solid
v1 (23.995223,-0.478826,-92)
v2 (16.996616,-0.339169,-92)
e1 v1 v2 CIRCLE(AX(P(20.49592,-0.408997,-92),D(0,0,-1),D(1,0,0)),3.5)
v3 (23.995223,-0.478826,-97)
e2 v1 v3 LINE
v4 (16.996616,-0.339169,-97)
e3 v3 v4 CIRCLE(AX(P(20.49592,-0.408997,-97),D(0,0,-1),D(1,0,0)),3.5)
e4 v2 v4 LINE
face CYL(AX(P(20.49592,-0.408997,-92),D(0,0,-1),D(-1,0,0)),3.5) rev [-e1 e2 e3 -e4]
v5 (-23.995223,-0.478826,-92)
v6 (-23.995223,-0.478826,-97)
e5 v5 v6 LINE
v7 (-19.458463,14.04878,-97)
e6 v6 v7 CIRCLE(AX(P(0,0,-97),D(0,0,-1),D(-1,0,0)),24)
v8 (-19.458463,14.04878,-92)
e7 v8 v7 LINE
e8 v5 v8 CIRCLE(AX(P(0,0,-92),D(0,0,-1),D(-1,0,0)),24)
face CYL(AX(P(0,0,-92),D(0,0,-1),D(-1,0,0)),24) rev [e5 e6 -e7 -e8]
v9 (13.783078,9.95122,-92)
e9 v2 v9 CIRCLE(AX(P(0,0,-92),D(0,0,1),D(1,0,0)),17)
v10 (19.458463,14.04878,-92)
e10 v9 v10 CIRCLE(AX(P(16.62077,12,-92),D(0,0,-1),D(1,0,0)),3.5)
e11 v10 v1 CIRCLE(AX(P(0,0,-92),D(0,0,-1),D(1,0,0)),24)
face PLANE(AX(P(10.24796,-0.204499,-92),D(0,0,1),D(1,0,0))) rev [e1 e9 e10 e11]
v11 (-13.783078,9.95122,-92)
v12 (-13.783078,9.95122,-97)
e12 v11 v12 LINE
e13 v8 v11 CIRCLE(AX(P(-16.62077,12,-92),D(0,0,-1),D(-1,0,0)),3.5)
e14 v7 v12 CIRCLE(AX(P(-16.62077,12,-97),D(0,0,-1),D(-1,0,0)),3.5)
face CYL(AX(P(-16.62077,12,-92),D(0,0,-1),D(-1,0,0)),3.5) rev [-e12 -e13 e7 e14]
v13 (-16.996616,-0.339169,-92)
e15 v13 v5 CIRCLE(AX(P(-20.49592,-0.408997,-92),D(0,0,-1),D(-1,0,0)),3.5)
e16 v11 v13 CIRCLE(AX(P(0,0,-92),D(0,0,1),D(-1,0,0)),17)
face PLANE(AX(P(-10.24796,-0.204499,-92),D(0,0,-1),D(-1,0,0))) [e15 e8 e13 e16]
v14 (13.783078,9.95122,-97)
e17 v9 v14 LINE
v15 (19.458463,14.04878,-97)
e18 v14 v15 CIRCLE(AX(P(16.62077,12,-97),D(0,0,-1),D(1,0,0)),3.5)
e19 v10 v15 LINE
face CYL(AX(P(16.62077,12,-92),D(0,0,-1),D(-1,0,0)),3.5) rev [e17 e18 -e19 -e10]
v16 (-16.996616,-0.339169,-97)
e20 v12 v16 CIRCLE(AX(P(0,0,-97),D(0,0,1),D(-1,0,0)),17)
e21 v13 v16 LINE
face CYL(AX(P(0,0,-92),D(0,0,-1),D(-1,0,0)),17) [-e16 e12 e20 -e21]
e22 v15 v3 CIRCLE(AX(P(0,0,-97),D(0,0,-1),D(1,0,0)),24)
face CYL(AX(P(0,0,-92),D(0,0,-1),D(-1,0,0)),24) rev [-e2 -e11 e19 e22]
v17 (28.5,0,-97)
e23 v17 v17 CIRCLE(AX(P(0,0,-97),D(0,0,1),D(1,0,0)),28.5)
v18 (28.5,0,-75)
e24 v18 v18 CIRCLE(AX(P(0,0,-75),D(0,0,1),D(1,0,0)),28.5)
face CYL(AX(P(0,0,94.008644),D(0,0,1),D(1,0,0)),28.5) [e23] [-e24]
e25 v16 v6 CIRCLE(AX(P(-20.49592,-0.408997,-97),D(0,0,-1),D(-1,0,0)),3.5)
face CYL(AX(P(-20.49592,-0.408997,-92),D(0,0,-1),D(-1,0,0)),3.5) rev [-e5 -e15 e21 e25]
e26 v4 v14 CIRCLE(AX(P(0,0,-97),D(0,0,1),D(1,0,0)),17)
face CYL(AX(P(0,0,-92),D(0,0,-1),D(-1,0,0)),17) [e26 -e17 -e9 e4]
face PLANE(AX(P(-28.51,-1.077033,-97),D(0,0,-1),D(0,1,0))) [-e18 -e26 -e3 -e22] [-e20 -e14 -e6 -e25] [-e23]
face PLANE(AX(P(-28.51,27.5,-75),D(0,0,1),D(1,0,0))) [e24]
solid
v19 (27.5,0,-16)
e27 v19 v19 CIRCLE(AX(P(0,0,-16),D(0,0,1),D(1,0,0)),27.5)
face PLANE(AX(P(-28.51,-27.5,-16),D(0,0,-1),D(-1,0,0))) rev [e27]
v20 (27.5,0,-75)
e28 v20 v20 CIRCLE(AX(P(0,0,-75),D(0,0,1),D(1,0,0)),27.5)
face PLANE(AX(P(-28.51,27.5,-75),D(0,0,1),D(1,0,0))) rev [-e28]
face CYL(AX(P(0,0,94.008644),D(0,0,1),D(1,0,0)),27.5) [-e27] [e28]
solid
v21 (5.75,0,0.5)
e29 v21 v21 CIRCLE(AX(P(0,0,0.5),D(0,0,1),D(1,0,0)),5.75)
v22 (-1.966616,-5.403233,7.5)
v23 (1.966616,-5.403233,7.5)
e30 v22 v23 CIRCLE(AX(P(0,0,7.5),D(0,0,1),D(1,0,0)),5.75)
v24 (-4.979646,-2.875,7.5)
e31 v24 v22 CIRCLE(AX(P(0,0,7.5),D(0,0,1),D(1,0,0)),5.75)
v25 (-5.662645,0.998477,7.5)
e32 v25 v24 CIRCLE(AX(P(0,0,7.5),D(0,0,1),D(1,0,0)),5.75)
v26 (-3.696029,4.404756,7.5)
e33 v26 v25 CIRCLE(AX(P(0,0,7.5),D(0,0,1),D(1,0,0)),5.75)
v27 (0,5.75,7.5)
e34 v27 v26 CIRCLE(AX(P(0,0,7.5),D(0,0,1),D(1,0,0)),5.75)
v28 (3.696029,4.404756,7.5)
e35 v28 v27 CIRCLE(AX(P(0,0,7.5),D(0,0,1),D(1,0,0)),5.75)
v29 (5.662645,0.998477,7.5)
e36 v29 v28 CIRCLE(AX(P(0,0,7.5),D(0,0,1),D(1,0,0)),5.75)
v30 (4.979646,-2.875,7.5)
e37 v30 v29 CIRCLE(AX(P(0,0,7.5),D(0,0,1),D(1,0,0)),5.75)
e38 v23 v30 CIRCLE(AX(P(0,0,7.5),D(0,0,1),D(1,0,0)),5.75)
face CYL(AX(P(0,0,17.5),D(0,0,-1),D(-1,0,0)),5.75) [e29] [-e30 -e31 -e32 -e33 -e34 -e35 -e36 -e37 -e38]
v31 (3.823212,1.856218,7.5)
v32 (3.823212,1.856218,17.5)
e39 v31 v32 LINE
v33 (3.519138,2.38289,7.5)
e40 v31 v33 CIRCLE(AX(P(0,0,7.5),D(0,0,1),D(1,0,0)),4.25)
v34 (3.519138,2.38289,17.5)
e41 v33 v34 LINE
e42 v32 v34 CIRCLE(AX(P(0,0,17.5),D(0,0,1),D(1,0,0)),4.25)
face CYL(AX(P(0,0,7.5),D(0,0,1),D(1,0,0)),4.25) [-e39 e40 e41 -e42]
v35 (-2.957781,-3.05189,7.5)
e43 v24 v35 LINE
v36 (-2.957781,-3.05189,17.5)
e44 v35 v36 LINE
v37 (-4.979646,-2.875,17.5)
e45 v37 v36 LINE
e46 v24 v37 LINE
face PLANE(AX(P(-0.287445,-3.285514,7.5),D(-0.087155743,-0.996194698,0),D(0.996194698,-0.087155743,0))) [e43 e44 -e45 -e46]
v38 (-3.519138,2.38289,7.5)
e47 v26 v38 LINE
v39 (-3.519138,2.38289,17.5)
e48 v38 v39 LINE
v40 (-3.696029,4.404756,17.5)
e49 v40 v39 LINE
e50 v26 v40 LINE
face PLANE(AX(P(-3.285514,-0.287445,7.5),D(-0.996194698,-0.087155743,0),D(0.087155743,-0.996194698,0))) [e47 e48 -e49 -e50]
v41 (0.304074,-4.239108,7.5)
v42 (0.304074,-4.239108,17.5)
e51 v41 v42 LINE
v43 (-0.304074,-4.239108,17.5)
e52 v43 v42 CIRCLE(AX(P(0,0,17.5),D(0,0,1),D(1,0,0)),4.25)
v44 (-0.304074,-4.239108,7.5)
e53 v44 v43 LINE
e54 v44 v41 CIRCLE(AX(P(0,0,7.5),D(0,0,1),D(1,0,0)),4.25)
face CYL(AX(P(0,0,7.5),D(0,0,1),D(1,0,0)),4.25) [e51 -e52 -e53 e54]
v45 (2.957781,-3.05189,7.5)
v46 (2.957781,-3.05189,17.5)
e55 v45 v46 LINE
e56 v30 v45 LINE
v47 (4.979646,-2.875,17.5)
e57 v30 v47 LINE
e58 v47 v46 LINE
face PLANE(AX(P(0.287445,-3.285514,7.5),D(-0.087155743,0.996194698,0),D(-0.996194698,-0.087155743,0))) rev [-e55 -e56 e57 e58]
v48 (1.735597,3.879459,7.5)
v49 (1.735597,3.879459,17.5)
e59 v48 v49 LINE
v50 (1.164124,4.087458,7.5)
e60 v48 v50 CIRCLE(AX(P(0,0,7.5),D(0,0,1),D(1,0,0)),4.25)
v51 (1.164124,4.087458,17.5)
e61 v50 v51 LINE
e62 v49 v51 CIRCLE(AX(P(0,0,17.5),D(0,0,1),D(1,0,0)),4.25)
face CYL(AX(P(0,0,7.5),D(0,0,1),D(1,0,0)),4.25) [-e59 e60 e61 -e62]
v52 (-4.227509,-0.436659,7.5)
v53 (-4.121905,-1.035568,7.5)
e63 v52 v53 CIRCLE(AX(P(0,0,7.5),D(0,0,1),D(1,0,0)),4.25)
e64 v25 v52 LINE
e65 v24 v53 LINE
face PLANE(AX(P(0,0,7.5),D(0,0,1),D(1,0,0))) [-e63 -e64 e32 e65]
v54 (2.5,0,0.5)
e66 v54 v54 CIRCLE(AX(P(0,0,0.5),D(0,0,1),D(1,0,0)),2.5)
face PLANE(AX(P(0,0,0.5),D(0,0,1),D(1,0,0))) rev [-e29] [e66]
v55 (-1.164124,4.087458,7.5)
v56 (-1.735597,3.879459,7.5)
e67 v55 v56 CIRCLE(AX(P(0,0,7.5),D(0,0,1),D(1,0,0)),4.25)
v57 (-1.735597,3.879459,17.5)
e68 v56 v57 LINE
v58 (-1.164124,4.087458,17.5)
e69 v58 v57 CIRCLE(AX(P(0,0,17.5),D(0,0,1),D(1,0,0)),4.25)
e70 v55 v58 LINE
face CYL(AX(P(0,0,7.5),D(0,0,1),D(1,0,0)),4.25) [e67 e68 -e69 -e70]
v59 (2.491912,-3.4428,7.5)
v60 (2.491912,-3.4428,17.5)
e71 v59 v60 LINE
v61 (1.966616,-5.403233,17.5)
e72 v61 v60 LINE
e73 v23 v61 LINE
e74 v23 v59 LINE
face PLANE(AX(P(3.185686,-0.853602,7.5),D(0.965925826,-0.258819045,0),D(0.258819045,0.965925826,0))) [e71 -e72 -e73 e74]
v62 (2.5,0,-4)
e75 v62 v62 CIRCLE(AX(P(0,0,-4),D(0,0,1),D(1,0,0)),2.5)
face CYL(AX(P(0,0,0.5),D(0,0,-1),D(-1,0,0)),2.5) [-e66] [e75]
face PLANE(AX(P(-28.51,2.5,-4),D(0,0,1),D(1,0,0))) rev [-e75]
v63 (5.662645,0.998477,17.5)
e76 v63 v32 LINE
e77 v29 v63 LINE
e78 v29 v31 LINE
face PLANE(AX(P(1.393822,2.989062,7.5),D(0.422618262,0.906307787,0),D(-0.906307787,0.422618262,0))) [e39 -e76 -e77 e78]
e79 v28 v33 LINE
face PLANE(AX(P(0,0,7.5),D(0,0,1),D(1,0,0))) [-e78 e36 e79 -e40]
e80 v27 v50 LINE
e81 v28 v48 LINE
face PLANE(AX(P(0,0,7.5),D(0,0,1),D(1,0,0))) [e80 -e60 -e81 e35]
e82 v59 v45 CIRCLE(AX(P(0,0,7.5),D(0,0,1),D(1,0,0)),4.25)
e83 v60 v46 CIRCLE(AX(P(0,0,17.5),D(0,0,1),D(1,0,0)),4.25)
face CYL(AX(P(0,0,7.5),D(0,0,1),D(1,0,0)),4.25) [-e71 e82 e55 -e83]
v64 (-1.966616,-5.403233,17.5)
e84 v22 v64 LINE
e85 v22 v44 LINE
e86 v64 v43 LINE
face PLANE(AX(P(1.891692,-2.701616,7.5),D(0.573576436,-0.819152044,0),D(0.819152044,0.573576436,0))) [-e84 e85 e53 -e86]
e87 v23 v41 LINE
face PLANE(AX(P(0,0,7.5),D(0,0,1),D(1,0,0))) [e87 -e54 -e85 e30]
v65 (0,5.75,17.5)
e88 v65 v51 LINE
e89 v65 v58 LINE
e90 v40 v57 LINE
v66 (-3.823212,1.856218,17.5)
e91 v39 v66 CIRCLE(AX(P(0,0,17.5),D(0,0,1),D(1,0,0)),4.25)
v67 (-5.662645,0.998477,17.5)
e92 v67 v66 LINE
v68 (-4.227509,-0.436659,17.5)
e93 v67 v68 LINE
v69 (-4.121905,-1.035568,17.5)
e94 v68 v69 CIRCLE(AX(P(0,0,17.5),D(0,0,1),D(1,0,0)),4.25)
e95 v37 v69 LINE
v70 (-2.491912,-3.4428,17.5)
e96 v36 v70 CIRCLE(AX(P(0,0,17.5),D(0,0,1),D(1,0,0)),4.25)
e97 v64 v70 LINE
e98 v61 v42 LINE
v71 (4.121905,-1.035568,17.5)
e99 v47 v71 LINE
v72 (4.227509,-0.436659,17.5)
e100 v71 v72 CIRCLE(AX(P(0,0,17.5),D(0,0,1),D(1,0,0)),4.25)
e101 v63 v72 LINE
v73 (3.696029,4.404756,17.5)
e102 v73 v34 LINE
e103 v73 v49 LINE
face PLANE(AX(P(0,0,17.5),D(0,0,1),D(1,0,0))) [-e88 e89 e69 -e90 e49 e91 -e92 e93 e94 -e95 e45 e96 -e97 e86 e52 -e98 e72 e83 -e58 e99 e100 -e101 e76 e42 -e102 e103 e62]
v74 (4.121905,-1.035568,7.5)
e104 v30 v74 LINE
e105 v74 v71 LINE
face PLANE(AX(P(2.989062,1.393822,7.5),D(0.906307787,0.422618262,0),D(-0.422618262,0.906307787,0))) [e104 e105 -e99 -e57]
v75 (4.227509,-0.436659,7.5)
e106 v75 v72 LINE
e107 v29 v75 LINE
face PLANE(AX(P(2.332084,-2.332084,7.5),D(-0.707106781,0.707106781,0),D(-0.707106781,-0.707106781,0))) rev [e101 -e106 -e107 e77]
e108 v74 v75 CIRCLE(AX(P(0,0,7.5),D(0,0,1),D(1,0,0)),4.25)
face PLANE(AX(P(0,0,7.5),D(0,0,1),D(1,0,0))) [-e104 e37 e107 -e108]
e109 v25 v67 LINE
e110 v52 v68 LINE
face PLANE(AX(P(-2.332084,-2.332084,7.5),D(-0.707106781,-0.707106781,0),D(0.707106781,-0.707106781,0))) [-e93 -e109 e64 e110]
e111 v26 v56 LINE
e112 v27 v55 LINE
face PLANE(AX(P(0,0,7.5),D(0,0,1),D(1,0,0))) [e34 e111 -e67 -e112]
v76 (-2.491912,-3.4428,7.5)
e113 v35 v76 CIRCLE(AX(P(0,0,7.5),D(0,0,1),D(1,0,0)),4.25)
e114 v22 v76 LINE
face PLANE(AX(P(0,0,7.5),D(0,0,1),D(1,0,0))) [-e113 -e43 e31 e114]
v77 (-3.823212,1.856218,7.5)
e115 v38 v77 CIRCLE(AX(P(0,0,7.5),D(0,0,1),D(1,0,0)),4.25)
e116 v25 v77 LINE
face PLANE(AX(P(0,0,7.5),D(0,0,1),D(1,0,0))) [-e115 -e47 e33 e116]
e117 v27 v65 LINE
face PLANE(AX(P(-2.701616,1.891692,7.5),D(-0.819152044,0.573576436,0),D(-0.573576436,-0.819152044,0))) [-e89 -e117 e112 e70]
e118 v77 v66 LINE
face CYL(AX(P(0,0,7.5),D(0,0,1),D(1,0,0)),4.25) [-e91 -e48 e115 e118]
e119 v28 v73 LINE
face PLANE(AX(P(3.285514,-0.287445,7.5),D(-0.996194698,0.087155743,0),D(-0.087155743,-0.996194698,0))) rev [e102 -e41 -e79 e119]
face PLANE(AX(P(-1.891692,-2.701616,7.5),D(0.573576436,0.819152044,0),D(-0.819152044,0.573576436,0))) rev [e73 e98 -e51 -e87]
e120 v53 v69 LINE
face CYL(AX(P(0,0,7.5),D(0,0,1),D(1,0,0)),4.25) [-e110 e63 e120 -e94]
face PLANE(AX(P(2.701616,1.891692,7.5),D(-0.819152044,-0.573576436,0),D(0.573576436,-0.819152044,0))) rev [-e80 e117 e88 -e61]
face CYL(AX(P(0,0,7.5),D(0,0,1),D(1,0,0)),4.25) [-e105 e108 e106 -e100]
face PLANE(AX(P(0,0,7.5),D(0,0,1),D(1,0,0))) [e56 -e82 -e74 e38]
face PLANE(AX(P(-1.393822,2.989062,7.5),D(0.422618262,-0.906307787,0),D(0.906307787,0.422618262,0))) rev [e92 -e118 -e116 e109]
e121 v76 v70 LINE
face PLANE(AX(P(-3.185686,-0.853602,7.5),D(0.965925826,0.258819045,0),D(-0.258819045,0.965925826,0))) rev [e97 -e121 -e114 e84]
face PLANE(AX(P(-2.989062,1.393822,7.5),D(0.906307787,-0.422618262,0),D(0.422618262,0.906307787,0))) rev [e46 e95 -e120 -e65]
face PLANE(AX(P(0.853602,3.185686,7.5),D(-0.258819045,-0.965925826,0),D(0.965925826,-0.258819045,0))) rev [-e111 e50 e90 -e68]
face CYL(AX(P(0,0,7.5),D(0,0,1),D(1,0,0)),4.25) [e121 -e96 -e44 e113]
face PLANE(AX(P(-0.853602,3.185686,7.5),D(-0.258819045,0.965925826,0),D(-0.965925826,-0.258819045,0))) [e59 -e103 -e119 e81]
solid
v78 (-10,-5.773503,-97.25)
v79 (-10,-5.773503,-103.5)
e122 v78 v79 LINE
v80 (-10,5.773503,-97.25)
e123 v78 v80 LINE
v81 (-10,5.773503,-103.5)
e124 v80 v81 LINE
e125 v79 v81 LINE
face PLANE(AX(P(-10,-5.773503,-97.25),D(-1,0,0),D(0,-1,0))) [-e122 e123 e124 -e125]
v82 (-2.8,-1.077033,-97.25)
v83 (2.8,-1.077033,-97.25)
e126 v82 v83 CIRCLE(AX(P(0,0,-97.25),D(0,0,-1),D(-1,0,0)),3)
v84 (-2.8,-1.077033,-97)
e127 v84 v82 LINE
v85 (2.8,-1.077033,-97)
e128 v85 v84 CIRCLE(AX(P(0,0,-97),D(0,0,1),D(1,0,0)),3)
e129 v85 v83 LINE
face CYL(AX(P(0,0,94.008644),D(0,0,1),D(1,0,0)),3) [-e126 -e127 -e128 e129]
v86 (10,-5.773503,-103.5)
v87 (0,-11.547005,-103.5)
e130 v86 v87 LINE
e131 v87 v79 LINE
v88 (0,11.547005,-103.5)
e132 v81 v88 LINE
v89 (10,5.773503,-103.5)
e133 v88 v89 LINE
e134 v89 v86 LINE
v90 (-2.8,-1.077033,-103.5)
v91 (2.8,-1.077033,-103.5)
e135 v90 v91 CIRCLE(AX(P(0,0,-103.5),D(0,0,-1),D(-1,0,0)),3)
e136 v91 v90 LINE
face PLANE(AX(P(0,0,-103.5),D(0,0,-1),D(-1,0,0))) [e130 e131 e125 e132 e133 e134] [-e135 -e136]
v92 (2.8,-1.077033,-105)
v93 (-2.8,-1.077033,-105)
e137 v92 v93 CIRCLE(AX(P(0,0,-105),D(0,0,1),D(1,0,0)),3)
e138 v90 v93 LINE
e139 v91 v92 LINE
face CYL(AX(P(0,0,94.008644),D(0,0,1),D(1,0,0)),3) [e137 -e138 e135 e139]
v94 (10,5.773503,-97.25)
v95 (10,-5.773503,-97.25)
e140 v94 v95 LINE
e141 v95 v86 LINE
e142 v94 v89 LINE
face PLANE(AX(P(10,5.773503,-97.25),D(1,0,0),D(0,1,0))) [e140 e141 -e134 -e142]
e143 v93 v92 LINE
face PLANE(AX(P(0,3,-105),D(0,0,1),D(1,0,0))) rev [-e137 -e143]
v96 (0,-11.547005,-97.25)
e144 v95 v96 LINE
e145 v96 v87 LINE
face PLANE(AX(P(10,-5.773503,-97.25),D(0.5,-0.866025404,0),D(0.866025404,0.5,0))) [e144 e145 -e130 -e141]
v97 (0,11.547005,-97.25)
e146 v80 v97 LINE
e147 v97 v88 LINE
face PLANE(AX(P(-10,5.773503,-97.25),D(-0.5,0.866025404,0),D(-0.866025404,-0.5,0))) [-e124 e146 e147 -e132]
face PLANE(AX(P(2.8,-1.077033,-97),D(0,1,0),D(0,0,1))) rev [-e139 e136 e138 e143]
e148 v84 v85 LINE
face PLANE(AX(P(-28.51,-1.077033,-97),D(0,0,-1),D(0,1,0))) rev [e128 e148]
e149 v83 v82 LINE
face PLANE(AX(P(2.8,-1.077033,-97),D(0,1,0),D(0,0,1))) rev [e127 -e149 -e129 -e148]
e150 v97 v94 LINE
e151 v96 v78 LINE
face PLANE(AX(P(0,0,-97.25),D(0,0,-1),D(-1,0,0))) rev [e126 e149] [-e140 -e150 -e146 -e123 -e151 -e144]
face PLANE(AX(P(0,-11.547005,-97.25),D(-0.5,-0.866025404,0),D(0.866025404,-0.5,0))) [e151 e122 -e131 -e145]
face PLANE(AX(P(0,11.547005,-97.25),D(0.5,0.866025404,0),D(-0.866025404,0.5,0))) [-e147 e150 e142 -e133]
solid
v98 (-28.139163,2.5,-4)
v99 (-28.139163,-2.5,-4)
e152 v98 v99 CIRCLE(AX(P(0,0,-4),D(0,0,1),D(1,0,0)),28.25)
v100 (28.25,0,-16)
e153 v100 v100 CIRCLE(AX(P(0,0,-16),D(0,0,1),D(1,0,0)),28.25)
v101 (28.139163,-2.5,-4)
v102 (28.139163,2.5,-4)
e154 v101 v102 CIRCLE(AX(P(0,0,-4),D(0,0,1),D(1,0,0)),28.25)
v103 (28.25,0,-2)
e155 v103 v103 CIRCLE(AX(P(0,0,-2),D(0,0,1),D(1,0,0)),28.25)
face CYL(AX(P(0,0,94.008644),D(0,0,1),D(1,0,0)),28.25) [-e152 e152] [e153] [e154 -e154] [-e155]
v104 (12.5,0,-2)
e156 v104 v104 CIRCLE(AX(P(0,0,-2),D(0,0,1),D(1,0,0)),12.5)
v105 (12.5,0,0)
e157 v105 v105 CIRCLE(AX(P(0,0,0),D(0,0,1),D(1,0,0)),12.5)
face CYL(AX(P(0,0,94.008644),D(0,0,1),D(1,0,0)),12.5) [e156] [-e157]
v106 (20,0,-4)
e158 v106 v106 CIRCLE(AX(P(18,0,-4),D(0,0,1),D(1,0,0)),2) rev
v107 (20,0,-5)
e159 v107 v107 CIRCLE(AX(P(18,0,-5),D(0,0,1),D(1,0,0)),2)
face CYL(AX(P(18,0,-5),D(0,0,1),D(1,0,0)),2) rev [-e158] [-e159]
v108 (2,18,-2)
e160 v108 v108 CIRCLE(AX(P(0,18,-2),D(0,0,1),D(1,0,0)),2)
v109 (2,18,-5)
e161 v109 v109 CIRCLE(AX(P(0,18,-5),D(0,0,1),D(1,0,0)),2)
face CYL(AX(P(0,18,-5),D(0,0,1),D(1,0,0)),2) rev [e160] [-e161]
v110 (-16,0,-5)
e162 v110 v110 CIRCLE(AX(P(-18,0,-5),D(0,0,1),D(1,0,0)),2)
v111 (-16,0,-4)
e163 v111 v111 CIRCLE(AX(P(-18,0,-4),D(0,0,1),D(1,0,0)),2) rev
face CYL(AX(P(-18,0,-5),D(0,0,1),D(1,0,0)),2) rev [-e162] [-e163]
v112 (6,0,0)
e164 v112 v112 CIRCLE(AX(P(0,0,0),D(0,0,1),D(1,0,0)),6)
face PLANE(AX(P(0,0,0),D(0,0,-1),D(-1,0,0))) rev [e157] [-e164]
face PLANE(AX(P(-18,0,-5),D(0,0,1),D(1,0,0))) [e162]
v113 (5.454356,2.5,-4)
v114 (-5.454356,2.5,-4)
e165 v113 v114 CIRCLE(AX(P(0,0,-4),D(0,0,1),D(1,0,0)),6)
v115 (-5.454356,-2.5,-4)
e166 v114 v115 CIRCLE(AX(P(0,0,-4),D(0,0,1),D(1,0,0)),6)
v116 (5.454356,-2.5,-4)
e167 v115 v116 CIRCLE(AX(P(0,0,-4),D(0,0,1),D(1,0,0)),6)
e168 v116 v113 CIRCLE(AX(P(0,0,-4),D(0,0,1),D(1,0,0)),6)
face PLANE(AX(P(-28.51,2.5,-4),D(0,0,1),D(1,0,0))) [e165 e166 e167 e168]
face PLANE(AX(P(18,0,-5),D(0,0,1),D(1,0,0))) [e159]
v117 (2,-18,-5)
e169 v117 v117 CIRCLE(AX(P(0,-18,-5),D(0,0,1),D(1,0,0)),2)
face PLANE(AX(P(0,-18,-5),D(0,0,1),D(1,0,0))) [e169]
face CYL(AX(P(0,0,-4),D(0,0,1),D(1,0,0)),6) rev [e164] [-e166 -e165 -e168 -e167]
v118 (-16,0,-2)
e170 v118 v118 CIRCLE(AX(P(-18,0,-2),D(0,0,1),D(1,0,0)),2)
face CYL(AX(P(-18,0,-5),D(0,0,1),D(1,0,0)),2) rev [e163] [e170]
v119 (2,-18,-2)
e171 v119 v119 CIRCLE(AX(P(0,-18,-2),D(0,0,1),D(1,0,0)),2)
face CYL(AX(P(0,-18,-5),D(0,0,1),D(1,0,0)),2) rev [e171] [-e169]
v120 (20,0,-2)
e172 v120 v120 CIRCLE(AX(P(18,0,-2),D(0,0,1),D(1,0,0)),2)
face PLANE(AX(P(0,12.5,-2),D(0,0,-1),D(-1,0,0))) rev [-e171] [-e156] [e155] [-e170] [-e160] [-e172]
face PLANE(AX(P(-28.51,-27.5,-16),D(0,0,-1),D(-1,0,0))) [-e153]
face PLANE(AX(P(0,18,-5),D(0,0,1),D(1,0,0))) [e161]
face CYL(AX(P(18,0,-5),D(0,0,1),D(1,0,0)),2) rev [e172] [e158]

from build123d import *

# Parameters (mm, degrees)
SKETCH5_R           = 2
CUT_EXTRUDE1_DEPTH  = 3
SKETCH13_R          = 6
CUT_EXTRUDE3_DEPTH  = 4
SKETCH14_R          = 2.5
BOSS_EXTRUDE2_DEPTH = 4.5
SKETCH15_R          = 5.75
BOSS_EXTRUDE3_DEPTH = 17
CUT_EXTRUDE7_START  = -10
CUT_EXTRUDE7_DEPTH  = 10
CUT_EXTRUDE9_DEPTH  = 8
BOSS_EXTRUDE7_DEPTH = 6.25
CUT_EXTRUDE10_DEPTH = 5
SPLIT1_START        = -97
SPLIT1_OUTLINE_R    = 28.5
SPLIT1_DEPTH        = 22
SPLIT1_START_2      = -92
SPLIT1_2_DEPTH      = 17
SPLIT1_START_3      = -75
SPLIT1_3_OUTLINE_R  = 27.5
SPLIT1_3_DEPTH      = 59
SPLIT1_START_4      = -105
SPLIT1_4_OUTLINE_R  = 28.5
SPLIT1_4_DEPTH      = 89
SPLIT1_START_5      = -4
SPLIT1_5_OUTLINE_R  = 5.75
SPLIT1_5_DEPTH      = 21.5
SPLIT1_START_6      = 0.5
SPLIT1_6_DEPTH      = 17
SPLIT1_7_DEPTH      = 7
SPLIT1_8_OUTLINE_R  = 2.5
SPLIT1_8_DEPTH      = 4.5
SPLIT1_START_7      = -103.5
SPLIT1_9_DEPTH      = 6.25
SPLIT1_10_DEPTH     = 8


# Read off the part's stored shape, not the designer's step: Split1
with BuildPart() as part:
    # Sketch3 → Revolve1 (revolve)
    with BuildSketch(Plane(origin=(0, 0, 0), x_dir=(0, 0, -1), z_dir=(1, 0, 0)), mode=Mode.PRIVATE) as revolve1_sk:
        Polygon((0, 0), (0, 12.5), (2, 12.5), (2, 28.25), (16, 28.25), (16, 27.5), (75, 27.5), (75, 28.5), (97, 28.5), (97, 3), (105, 3), (105, 0), (97, 0), align=None)
    revolve(revolve1_sk.sketch.rotate(Axis((0, 0, 94.008643936), (0, 0, -1)), 90), axis=Axis((0, 0, 94.008643936), (0, 0, -1)))

    # Sketch5 → Cut-Extrude1 (cut)
    with BuildSketch(Plane.XY.offset(-2)):
        with Locations((0, 18)):
            Circle(SKETCH5_R)
        with Locations((18, 0)):
            Circle(SKETCH5_R)
        with Locations((0, -18)):
            Circle(SKETCH5_R)
        with Locations((-18, 0)):
            Circle(SKETCH5_R)
    extrude(amount=-CUT_EXTRUDE1_DEPTH, mode=Mode.SUBTRACT)

    # Sketch13 → Cut-Extrude3 (cut)
    with BuildSketch(Plane.XY):
        Circle(SKETCH13_R)
    extrude(amount=-CUT_EXTRUDE3_DEPTH, mode=Mode.SUBTRACT)

    # Sketch14 → Boss-Extrude2 (add)
    with BuildSketch(Plane.XY.offset(-4)):
        Circle(SKETCH14_R)
    extrude(amount=BOSS_EXTRUDE2_DEPTH)

    # Sketch15 → Boss-Extrude3 (add)
    with BuildSketch(Plane.XY.offset(0.5)):
        Circle(SKETCH15_R)
    extrude(amount=BOSS_EXTRUDE3_DEPTH)

    # Sketch17 → Cut-Extrude7 (cut)
    with BuildSketch(Plane.XY.offset(17.5).offset(CUT_EXTRUDE7_START)):
        with BuildLine():
            Line((-1.164124293, 4.087458211), (0, 5.75))
            ThreePointArc((0, 5.75), (-1.966615824, 5.40323257), (-3.696028756, 4.404755548))
            Line((-3.696028756, 4.404755548), (-1.735596548, 3.879459321))
            ThreePointArc((-1.735596548, 3.879459321), (-1.453585609, 3.993693638), (-1.164124293, 4.087458211))
        make_face()
        with BuildLine():
            Line((-3.519138439, 2.382889978), (-3.696028756, 4.404755548))
            ThreePointArc((-3.696028756, 4.404755548), (-4.979646072, 2.875), (-5.66264458, 0.998477022))
            Line((-5.66264458, 0.998477022), (-3.823212475, 1.856218299))
            ThreePointArc((-3.823212475, 1.856218299), (-3.680607966, 2.125), (-3.519138439, 2.382889978))
        make_face()
        with BuildLine():
            Line((-4.227508599, -0.436658959), (-5.66264458, 0.998477022))
            ThreePointArc((-5.66264458, 0.998477022), (-5.66264458, -0.998477022), (-4.979646072, -2.875))
            Line((-4.979646072, -2.875), (-4.121904795, -1.035567895))
            ThreePointArc((-4.121904795, -1.035567895), (-4.18543295, -0.738004755), (-4.227508599, -0.436658959))
        make_face()
        with BuildLine():
            Line((-2.957780502, -3.051890317), (-4.979646072, -2.875))
            ThreePointArc((-4.979646072, -2.875), (-3.696028756, -4.404755548), (-1.966615824, -5.40323257))
            Line((-1.966615824, -5.40323257), (-2.491912051, -3.442800362))
            ThreePointArc((-2.491912051, -3.442800362), (-2.731847341, -3.255688883), (-2.957780502, -3.051890317))
        make_face()
        with BuildLine():
            Line((-0.304074036, -4.239108277), (-1.966615824, -5.40323257))
            ThreePointArc((-1.966615824, -5.40323257), (0, -5.75), (1.966615824, -5.40323257))
            Line((1.966615824, -5.40323257), (0.304074036, -4.239108277))
            ThreePointArc((0.304074036, -4.239108277), (0, -4.25), (-0.304074036, -4.239108277))
        make_face()
        with BuildLine():
            ThreePointArc((1.966615824, -5.40323257), (3.696028756, -4.404755548), (4.979646072, -2.875))
            Line((4.979646072, -2.875), (2.957780502, -3.051890317))
            ThreePointArc((2.957780502, -3.051890317), (2.731847341, -3.255688883), (2.491912051, -3.442800362))
            Line((2.491912051, -3.442800362), (1.966615824, -5.40323257))
        make_face()
        with BuildLine():
            ThreePointArc((5.75, 0), (5.728119514, 0.501145521), (5.66264458, 0.998477022))
            Line((5.66264458, 0.998477022), (4.227508599, -0.436658959))
            ThreePointArc((4.227508599, -0.436658959), (4.18543295, -0.738004755), (4.121904795, -1.035567895))
            Line((4.121904795, -1.035567895), (4.979646072, -2.875))
            ThreePointArc((4.979646072, -2.875), (5.554073501, -1.488209509), (5.75, 0))
        make_face()
        with BuildLine():
            ThreePointArc((5.66264458, 0.998477022), (4.979646072, 2.875), (3.696028756, 4.404755548))
            Line((3.696028756, 4.404755548), (3.519138439, 2.382889978))
            ThreePointArc((3.519138439, 2.382889978), (3.680607966, 2.125), (3.823212475, 1.856218299))
            Line((3.823212475, 1.856218299), (5.66264458, 0.998477022))
        make_face()
        with BuildLine():
            ThreePointArc((3.696028756, 4.404755548), (1.966615824, 5.40323257), (0, 5.75))
            Line((0, 5.75), (1.164124293, 4.087458211))
            ThreePointArc((1.164124293, 4.087458211), (1.453585609, 3.993693638), (1.735596548, 3.879459321))
            Line((1.735596548, 3.879459321), (3.696028756, 4.404755548))
        make_face()
    extrude(amount=CUT_EXTRUDE7_DEPTH, mode=Mode.SUBTRACT)

    # Sketch24 → Cut-Extrude9 (cut)
    with BuildSketch(Plane(origin=(0, 0, -105), x_dir=(-1, 0, 0), z_dir=(0, 0, -1))):
        with BuildLine():
            Line((-2.8, -1.077032961), (2.8, -1.077032961))
            ThreePointArc((2.8, -1.077032961), (0, -3), (-2.8, -1.077032961))
        make_face()
    extrude(amount=-CUT_EXTRUDE9_DEPTH, mode=Mode.SUBTRACT)

    # Sketch26 → Boss-Extrude7 (add)
    with BuildSketch(Plane(origin=(0, 0, -103.5), x_dir=(-1, 0, 0), z_dir=(0, 0, -1))):
        Polygon((0, 11.547005384), (-10, 5.773502692), (-10, -5.773502692), (0, -11.547005384), (10, -5.773502692), (10, 5.773502692), align=None)
    extrude(amount=-BOSS_EXTRUDE7_DEPTH)

    # Sketch27 → Cut-Extrude10 (cut)
    with BuildSketch(Plane(origin=(0, 0, -97), x_dir=(-1, 0, 0), z_dir=(0, 0, -1))):
        with BuildLine():
            ThreePointArc((23.995222971, -0.478826225), (22.908918278, 7.154122122), (19.458462601, 14.048780488))
            ThreePointArc((19.458462601, 14.048780488), (14.571989651, 14.837692463), (13.783077676, 9.951219512))
            ThreePointArc((13.783077676, 9.951219512), (16.227150447, 5.06750317), (16.996616271, -0.339168576))
            ThreePointArc((16.996616271, -0.339168576), (20.426090797, -3.908300751), (23.995222971, -0.478826225))
        make_face()
        with BuildLine():
            ThreePointArc((-23.995222971, -0.478826225), (-22.908918278, 7.154122122), (-19.458462601, 14.048780488))
            ThreePointArc((-19.458462601, 14.048780488), (-14.571989651, 14.837692463), (-13.783077676, 9.951219512))
            ThreePointArc((-13.783077676, 9.951219512), (-16.227150447, 5.06750317), (-16.996616271, -0.339168576))
            ThreePointArc((-16.996616271, -0.339168576), (-20.426090797, -3.908300751), (-23.995222971, -0.478826225))
        make_face()
    extrude(amount=-CUT_EXTRUDE10_DEPTH, mode=Mode.SUBTRACT)

    # Split1 4 outline → Split1 4 (cut)
    with BuildSketch(Plane.XY.offset(SPLIT1_START_4)):
        Circle(SPLIT1_4_OUTLINE_R)
    extrude(amount=SPLIT1_4_DEPTH, mode=Mode.SUBTRACT)

    # Split1 5 outline → Split1 5 (cut)
    with BuildSketch(Plane.XY.offset(SPLIT1_START_5)):
        Circle(SPLIT1_5_OUTLINE_R)
    extrude(amount=SPLIT1_5_DEPTH, mode=Mode.SUBTRACT)


with BuildPart() as body_2:
    # Split1 outline → Split1 (new body)
    with BuildSketch(Plane.XY.offset(SPLIT1_START)):
        Circle(SPLIT1_OUTLINE_R)
        with BuildLine():
            ThreePointArc((-13.783077676, 9.951219512), (-16.227150447, 5.06750317), (-16.996616271, -0.339168576))
            ThreePointArc((-16.996616271, -0.339168576), (-20.426090796, -3.908300751), (-23.995222971, -0.478826225))
            ThreePointArc((-23.995222971, -0.478826225), (-22.908918278, 7.154122122), (-19.458462601, 14.048780488))
            ThreePointArc((-19.458462601, 14.048780488), (-14.57198965, 14.837692463), (-13.783077676, 9.951219512))
        make_face(mode=Mode.SUBTRACT)
        with BuildLine():
            ThreePointArc((19.458462601, 14.048780488), (22.908918278, 7.154122122), (23.995222971, -0.478826225))
            ThreePointArc((23.995222971, -0.478826225), (20.426090796, -3.908300751), (16.996616271, -0.339168576))
            ThreePointArc((16.996616271, -0.339168576), (16.227150447, 5.06750317), (13.783077676, 9.951219512))
            ThreePointArc((13.783077676, 9.951219512), (14.57198965, 14.837692463), (19.458462601, 14.048780488))
        make_face(mode=Mode.SUBTRACT)
    extrude(amount=SPLIT1_DEPTH)

    # Split1 2 outline → Split1 2 (add)
    with BuildSketch(Plane.XY.offset(SPLIT1_START_2)):
        with BuildLine():
            ThreePointArc((16.996616271, -0.339168576), (20.426090796, -3.908300751), (23.995222971, -0.478826225))
            ThreePointArc((23.995222971, -0.478826225), (22.908918278, 7.154122122), (19.458462601, 14.048780488))
            ThreePointArc((19.458462601, 14.048780488), (14.57198965, 14.837692463), (13.783077676, 9.951219512))
            ThreePointArc((13.783077676, 9.951219512), (16.227150447, 5.06750317), (16.996616271, -0.339168576))
        make_face()
        with BuildLine():
            ThreePointArc((-23.995222971, -0.478826225), (-20.426090796, -3.908300751), (-16.996616271, -0.339168576))
            ThreePointArc((-16.996616271, -0.339168576), (-16.227150447, 5.06750317), (-13.783077676, 9.951219512))
            ThreePointArc((-13.783077676, 9.951219512), (-14.57198965, 14.837692463), (-19.458462601, 14.048780488))
            ThreePointArc((-19.458462601, 14.048780488), (-22.908918278, 7.154122122), (-23.995222971, -0.478826225))
        make_face()
    extrude(amount=SPLIT1_2_DEPTH)


with BuildPart() as body_3:
    # Split1 3 outline → Split1 3 (new body)
    with BuildSketch(Plane.XY.offset(SPLIT1_START_3)):
        Circle(SPLIT1_3_OUTLINE_R)
    extrude(amount=SPLIT1_3_DEPTH)


with BuildPart() as body_4:
    # Split1 6 outline → Split1 6 (new body)
    with BuildSketch(Plane.XY.offset(SPLIT1_START_6)):
        with BuildLine():
            Line((4.227508599, -0.436658959), (5.66264458, 0.998477022))
            Line((5.66264458, 0.998477022), (3.823212475, 1.856218299))
            ThreePointArc((3.823212475, 1.856218299), (3.680607966, 2.125), (3.519138439, 2.382889978))
            Line((3.519138439, 2.382889978), (3.696028756, 4.404755548))
            Line((3.696028756, 4.404755548), (1.735596548, 3.879459321))
            ThreePointArc((1.735596548, 3.879459321), (1.453585609, 3.993693638), (1.164124293, 4.087458211))
            Line((1.164124293, 4.087458211), (0, 5.75))
            Line((0, 5.75), (-1.164124293, 4.087458211))
            ThreePointArc((-1.164124293, 4.087458211), (-1.453585609, 3.993693638), (-1.735596548, 3.879459321))
            Line((-1.735596548, 3.879459321), (-3.696028756, 4.404755548))
            Line((-3.696028756, 4.404755548), (-3.519138439, 2.382889978))
            ThreePointArc((-3.519138439, 2.382889978), (-3.680607966, 2.125), (-3.823212475, 1.856218299))
            Line((-3.823212475, 1.856218299), (-5.66264458, 0.998477022))
            Line((-5.66264458, 0.998477022), (-4.227508599, -0.436658959))
            ThreePointArc((-4.227508599, -0.436658959), (-4.18543295, -0.738004755), (-4.121904795, -1.035567895))
            Line((-4.121904795, -1.035567895), (-4.979646072, -2.875))
            Line((-4.979646072, -2.875), (-2.957780502, -3.051890317))
            ThreePointArc((-2.957780502, -3.051890317), (-2.731847341, -3.255688883), (-2.491912051, -3.442800362))
            Line((-2.491912051, -3.442800362), (-1.966615824, -5.40323257))
            Line((-1.966615824, -5.40323257), (-0.304074036, -4.239108277))
            ThreePointArc((-0.304074036, -4.239108277), (0, -4.25), (0.304074036, -4.239108277))
            Line((0.304074036, -4.239108277), (1.966615824, -5.40323257))
            Line((1.966615824, -5.40323257), (2.491912051, -3.442800362))
            ThreePointArc((2.491912051, -3.442800362), (2.731847341, -3.255688883), (2.957780502, -3.051890317))
            Line((2.957780502, -3.051890317), (4.979646072, -2.875))
            Line((4.979646072, -2.875), (4.121904795, -1.035567895))
            ThreePointArc((4.121904795, -1.035567895), (4.18543295, -0.738004755), (4.227508599, -0.436658959))
        make_face()
    extrude(amount=SPLIT1_6_DEPTH)

    # Split1 7 outline → Split1 7 (add)
    with BuildSketch(Plane.XY.offset(SPLIT1_START_6)):
        with BuildLine():
            ThreePointArc((4.979646072, -2.875), (5.66264458, -0.998477021), (5.66264458, 0.998477022))
            Line((5.66264458, 0.998477022), (4.227508599, -0.436658959))
            ThreePointArc((4.227508599, -0.436658959), (4.18543295, -0.738004755), (4.121904795, -1.035567895))
            Line((4.121904795, -1.035567895), (4.979646072, -2.875))
        make_face()
        with BuildLine():
            Line((3.823212475, 1.856218299), (5.66264458, 0.998477022))
            ThreePointArc((5.66264458, 0.998477022), (4.979646072, 2.875), (3.696028756, 4.404755548))
            Line((3.696028756, 4.404755548), (3.519138439, 2.382889978))
            ThreePointArc((3.519138439, 2.382889978), (3.680607966, 2.125), (3.823212475, 1.856218299))
        make_face()
        with BuildLine():
            ThreePointArc((1.966615824, -5.40323257), (3.696028756, -4.404755548), (4.979646072, -2.875))
            Line((4.979646072, -2.875), (2.957780502, -3.051890317))
            ThreePointArc((2.957780502, -3.051890317), (2.731847341, -3.255688883), (2.491912051, -3.442800362))
            Line((2.491912051, -3.442800362), (1.966615824, -5.40323257))
        make_face()
        with BuildLine():
            Line((1.735596548, 3.879459321), (3.696028756, 4.404755548))
            ThreePointArc((3.696028756, 4.404755548), (1.966615824, 5.403232569), (0, 5.75))
            Line((0, 5.75), (1.164124293, 4.087458211))
            ThreePointArc((1.164124293, 4.087458211), (1.453585609, 3.993693638), (1.735596548, 3.879459321))
        make_face()
        with BuildLine():
            ThreePointArc((-1.966615824, -5.40323257), (0, -5.75), (1.966615824, -5.40323257))
            Line((1.966615824, -5.40323257), (0.304074036, -4.239108277))
            ThreePointArc((0.304074036, -4.239108277), (0, -4.25), (-0.304074036, -4.239108277))
            Line((-0.304074036, -4.239108277), (-1.966615824, -5.40323257))
        make_face()
        with BuildLine():
            Line((-1.164124293, 4.087458211), (0, 5.75))
            ThreePointArc((0, 5.75), (-1.966615824, 5.403232569), (-3.696028756, 4.404755548))
            Line((-3.696028756, 4.404755548), (-1.735596548, 3.879459321))
            ThreePointArc((-1.735596548, 3.879459321), (-1.453585609, 3.993693638), (-1.164124293, 4.087458211))
        make_face()
        with BuildLine():
            ThreePointArc((-4.979646072, -2.875), (-3.696028756, -4.404755548), (-1.966615824, -5.40323257))
            Line((-1.966615824, -5.40323257), (-2.491912051, -3.442800362))
            ThreePointArc((-2.491912051, -3.442800362), (-2.731847341, -3.255688883), (-2.957780502, -3.051890317))
            Line((-2.957780502, -3.051890317), (-4.979646072, -2.875))
        make_face()
        with BuildLine():
            Line((-3.519138439, 2.382889978), (-3.696028756, 4.404755548))
            ThreePointArc((-3.696028756, 4.404755548), (-4.979646072, 2.875), (-5.66264458, 0.998477022))
            Line((-5.66264458, 0.998477022), (-3.823212475, 1.856218299))
            ThreePointArc((-3.823212475, 1.856218299), (-3.680607966, 2.125), (-3.519138439, 2.382889978))
        make_face()
        with BuildLine():
            ThreePointArc((-5.66264458, 0.998477022), (-5.66264458, -0.998477021), (-4.979646072, -2.875))
            Line((-4.979646072, -2.875), (-4.121904795, -1.035567895))
            ThreePointArc((-4.121904795, -1.035567895), (-4.18543295, -0.738004755), (-4.227508599, -0.436658959))
            Line((-4.227508599, -0.436658959), (-5.66264458, 0.998477022))
        make_face()
    extrude(amount=SPLIT1_7_DEPTH)

    # Split1 8 outline → Split1 8 (add)
    with BuildSketch(Plane.XY.offset(SPLIT1_START_5)):
        Circle(SPLIT1_8_OUTLINE_R)
    extrude(amount=SPLIT1_8_DEPTH)


with BuildPart() as body_5:
    # Split1 9 outline → Split1 9 (new body)
    with BuildSketch(Plane.XY.offset(SPLIT1_START_7)):
        Polygon((10, -5.773502692), (10, 5.773502692), (0, 11.547005384), (-10, 5.773502692), (-10, -5.773502692), (0, -11.547005384), align=None)
    extrude(amount=SPLIT1_9_DEPTH)

    # Split1 10 outline → Split1 10 (add)
    with BuildSketch(Plane.XY.offset(SPLIT1_START_4)):
        with BuildLine():
            Line((-2.8, -1.077032961), (2.8, -1.077032961))
            ThreePointArc((2.8, -1.077032961), (0, 3), (-2.8, -1.077032961))
        make_face()
    extrude(amount=SPLIT1_10_DEPTH)


solid = Compound([part.part, body_2.part, body_3.part, body_4.part, body_5.part])
